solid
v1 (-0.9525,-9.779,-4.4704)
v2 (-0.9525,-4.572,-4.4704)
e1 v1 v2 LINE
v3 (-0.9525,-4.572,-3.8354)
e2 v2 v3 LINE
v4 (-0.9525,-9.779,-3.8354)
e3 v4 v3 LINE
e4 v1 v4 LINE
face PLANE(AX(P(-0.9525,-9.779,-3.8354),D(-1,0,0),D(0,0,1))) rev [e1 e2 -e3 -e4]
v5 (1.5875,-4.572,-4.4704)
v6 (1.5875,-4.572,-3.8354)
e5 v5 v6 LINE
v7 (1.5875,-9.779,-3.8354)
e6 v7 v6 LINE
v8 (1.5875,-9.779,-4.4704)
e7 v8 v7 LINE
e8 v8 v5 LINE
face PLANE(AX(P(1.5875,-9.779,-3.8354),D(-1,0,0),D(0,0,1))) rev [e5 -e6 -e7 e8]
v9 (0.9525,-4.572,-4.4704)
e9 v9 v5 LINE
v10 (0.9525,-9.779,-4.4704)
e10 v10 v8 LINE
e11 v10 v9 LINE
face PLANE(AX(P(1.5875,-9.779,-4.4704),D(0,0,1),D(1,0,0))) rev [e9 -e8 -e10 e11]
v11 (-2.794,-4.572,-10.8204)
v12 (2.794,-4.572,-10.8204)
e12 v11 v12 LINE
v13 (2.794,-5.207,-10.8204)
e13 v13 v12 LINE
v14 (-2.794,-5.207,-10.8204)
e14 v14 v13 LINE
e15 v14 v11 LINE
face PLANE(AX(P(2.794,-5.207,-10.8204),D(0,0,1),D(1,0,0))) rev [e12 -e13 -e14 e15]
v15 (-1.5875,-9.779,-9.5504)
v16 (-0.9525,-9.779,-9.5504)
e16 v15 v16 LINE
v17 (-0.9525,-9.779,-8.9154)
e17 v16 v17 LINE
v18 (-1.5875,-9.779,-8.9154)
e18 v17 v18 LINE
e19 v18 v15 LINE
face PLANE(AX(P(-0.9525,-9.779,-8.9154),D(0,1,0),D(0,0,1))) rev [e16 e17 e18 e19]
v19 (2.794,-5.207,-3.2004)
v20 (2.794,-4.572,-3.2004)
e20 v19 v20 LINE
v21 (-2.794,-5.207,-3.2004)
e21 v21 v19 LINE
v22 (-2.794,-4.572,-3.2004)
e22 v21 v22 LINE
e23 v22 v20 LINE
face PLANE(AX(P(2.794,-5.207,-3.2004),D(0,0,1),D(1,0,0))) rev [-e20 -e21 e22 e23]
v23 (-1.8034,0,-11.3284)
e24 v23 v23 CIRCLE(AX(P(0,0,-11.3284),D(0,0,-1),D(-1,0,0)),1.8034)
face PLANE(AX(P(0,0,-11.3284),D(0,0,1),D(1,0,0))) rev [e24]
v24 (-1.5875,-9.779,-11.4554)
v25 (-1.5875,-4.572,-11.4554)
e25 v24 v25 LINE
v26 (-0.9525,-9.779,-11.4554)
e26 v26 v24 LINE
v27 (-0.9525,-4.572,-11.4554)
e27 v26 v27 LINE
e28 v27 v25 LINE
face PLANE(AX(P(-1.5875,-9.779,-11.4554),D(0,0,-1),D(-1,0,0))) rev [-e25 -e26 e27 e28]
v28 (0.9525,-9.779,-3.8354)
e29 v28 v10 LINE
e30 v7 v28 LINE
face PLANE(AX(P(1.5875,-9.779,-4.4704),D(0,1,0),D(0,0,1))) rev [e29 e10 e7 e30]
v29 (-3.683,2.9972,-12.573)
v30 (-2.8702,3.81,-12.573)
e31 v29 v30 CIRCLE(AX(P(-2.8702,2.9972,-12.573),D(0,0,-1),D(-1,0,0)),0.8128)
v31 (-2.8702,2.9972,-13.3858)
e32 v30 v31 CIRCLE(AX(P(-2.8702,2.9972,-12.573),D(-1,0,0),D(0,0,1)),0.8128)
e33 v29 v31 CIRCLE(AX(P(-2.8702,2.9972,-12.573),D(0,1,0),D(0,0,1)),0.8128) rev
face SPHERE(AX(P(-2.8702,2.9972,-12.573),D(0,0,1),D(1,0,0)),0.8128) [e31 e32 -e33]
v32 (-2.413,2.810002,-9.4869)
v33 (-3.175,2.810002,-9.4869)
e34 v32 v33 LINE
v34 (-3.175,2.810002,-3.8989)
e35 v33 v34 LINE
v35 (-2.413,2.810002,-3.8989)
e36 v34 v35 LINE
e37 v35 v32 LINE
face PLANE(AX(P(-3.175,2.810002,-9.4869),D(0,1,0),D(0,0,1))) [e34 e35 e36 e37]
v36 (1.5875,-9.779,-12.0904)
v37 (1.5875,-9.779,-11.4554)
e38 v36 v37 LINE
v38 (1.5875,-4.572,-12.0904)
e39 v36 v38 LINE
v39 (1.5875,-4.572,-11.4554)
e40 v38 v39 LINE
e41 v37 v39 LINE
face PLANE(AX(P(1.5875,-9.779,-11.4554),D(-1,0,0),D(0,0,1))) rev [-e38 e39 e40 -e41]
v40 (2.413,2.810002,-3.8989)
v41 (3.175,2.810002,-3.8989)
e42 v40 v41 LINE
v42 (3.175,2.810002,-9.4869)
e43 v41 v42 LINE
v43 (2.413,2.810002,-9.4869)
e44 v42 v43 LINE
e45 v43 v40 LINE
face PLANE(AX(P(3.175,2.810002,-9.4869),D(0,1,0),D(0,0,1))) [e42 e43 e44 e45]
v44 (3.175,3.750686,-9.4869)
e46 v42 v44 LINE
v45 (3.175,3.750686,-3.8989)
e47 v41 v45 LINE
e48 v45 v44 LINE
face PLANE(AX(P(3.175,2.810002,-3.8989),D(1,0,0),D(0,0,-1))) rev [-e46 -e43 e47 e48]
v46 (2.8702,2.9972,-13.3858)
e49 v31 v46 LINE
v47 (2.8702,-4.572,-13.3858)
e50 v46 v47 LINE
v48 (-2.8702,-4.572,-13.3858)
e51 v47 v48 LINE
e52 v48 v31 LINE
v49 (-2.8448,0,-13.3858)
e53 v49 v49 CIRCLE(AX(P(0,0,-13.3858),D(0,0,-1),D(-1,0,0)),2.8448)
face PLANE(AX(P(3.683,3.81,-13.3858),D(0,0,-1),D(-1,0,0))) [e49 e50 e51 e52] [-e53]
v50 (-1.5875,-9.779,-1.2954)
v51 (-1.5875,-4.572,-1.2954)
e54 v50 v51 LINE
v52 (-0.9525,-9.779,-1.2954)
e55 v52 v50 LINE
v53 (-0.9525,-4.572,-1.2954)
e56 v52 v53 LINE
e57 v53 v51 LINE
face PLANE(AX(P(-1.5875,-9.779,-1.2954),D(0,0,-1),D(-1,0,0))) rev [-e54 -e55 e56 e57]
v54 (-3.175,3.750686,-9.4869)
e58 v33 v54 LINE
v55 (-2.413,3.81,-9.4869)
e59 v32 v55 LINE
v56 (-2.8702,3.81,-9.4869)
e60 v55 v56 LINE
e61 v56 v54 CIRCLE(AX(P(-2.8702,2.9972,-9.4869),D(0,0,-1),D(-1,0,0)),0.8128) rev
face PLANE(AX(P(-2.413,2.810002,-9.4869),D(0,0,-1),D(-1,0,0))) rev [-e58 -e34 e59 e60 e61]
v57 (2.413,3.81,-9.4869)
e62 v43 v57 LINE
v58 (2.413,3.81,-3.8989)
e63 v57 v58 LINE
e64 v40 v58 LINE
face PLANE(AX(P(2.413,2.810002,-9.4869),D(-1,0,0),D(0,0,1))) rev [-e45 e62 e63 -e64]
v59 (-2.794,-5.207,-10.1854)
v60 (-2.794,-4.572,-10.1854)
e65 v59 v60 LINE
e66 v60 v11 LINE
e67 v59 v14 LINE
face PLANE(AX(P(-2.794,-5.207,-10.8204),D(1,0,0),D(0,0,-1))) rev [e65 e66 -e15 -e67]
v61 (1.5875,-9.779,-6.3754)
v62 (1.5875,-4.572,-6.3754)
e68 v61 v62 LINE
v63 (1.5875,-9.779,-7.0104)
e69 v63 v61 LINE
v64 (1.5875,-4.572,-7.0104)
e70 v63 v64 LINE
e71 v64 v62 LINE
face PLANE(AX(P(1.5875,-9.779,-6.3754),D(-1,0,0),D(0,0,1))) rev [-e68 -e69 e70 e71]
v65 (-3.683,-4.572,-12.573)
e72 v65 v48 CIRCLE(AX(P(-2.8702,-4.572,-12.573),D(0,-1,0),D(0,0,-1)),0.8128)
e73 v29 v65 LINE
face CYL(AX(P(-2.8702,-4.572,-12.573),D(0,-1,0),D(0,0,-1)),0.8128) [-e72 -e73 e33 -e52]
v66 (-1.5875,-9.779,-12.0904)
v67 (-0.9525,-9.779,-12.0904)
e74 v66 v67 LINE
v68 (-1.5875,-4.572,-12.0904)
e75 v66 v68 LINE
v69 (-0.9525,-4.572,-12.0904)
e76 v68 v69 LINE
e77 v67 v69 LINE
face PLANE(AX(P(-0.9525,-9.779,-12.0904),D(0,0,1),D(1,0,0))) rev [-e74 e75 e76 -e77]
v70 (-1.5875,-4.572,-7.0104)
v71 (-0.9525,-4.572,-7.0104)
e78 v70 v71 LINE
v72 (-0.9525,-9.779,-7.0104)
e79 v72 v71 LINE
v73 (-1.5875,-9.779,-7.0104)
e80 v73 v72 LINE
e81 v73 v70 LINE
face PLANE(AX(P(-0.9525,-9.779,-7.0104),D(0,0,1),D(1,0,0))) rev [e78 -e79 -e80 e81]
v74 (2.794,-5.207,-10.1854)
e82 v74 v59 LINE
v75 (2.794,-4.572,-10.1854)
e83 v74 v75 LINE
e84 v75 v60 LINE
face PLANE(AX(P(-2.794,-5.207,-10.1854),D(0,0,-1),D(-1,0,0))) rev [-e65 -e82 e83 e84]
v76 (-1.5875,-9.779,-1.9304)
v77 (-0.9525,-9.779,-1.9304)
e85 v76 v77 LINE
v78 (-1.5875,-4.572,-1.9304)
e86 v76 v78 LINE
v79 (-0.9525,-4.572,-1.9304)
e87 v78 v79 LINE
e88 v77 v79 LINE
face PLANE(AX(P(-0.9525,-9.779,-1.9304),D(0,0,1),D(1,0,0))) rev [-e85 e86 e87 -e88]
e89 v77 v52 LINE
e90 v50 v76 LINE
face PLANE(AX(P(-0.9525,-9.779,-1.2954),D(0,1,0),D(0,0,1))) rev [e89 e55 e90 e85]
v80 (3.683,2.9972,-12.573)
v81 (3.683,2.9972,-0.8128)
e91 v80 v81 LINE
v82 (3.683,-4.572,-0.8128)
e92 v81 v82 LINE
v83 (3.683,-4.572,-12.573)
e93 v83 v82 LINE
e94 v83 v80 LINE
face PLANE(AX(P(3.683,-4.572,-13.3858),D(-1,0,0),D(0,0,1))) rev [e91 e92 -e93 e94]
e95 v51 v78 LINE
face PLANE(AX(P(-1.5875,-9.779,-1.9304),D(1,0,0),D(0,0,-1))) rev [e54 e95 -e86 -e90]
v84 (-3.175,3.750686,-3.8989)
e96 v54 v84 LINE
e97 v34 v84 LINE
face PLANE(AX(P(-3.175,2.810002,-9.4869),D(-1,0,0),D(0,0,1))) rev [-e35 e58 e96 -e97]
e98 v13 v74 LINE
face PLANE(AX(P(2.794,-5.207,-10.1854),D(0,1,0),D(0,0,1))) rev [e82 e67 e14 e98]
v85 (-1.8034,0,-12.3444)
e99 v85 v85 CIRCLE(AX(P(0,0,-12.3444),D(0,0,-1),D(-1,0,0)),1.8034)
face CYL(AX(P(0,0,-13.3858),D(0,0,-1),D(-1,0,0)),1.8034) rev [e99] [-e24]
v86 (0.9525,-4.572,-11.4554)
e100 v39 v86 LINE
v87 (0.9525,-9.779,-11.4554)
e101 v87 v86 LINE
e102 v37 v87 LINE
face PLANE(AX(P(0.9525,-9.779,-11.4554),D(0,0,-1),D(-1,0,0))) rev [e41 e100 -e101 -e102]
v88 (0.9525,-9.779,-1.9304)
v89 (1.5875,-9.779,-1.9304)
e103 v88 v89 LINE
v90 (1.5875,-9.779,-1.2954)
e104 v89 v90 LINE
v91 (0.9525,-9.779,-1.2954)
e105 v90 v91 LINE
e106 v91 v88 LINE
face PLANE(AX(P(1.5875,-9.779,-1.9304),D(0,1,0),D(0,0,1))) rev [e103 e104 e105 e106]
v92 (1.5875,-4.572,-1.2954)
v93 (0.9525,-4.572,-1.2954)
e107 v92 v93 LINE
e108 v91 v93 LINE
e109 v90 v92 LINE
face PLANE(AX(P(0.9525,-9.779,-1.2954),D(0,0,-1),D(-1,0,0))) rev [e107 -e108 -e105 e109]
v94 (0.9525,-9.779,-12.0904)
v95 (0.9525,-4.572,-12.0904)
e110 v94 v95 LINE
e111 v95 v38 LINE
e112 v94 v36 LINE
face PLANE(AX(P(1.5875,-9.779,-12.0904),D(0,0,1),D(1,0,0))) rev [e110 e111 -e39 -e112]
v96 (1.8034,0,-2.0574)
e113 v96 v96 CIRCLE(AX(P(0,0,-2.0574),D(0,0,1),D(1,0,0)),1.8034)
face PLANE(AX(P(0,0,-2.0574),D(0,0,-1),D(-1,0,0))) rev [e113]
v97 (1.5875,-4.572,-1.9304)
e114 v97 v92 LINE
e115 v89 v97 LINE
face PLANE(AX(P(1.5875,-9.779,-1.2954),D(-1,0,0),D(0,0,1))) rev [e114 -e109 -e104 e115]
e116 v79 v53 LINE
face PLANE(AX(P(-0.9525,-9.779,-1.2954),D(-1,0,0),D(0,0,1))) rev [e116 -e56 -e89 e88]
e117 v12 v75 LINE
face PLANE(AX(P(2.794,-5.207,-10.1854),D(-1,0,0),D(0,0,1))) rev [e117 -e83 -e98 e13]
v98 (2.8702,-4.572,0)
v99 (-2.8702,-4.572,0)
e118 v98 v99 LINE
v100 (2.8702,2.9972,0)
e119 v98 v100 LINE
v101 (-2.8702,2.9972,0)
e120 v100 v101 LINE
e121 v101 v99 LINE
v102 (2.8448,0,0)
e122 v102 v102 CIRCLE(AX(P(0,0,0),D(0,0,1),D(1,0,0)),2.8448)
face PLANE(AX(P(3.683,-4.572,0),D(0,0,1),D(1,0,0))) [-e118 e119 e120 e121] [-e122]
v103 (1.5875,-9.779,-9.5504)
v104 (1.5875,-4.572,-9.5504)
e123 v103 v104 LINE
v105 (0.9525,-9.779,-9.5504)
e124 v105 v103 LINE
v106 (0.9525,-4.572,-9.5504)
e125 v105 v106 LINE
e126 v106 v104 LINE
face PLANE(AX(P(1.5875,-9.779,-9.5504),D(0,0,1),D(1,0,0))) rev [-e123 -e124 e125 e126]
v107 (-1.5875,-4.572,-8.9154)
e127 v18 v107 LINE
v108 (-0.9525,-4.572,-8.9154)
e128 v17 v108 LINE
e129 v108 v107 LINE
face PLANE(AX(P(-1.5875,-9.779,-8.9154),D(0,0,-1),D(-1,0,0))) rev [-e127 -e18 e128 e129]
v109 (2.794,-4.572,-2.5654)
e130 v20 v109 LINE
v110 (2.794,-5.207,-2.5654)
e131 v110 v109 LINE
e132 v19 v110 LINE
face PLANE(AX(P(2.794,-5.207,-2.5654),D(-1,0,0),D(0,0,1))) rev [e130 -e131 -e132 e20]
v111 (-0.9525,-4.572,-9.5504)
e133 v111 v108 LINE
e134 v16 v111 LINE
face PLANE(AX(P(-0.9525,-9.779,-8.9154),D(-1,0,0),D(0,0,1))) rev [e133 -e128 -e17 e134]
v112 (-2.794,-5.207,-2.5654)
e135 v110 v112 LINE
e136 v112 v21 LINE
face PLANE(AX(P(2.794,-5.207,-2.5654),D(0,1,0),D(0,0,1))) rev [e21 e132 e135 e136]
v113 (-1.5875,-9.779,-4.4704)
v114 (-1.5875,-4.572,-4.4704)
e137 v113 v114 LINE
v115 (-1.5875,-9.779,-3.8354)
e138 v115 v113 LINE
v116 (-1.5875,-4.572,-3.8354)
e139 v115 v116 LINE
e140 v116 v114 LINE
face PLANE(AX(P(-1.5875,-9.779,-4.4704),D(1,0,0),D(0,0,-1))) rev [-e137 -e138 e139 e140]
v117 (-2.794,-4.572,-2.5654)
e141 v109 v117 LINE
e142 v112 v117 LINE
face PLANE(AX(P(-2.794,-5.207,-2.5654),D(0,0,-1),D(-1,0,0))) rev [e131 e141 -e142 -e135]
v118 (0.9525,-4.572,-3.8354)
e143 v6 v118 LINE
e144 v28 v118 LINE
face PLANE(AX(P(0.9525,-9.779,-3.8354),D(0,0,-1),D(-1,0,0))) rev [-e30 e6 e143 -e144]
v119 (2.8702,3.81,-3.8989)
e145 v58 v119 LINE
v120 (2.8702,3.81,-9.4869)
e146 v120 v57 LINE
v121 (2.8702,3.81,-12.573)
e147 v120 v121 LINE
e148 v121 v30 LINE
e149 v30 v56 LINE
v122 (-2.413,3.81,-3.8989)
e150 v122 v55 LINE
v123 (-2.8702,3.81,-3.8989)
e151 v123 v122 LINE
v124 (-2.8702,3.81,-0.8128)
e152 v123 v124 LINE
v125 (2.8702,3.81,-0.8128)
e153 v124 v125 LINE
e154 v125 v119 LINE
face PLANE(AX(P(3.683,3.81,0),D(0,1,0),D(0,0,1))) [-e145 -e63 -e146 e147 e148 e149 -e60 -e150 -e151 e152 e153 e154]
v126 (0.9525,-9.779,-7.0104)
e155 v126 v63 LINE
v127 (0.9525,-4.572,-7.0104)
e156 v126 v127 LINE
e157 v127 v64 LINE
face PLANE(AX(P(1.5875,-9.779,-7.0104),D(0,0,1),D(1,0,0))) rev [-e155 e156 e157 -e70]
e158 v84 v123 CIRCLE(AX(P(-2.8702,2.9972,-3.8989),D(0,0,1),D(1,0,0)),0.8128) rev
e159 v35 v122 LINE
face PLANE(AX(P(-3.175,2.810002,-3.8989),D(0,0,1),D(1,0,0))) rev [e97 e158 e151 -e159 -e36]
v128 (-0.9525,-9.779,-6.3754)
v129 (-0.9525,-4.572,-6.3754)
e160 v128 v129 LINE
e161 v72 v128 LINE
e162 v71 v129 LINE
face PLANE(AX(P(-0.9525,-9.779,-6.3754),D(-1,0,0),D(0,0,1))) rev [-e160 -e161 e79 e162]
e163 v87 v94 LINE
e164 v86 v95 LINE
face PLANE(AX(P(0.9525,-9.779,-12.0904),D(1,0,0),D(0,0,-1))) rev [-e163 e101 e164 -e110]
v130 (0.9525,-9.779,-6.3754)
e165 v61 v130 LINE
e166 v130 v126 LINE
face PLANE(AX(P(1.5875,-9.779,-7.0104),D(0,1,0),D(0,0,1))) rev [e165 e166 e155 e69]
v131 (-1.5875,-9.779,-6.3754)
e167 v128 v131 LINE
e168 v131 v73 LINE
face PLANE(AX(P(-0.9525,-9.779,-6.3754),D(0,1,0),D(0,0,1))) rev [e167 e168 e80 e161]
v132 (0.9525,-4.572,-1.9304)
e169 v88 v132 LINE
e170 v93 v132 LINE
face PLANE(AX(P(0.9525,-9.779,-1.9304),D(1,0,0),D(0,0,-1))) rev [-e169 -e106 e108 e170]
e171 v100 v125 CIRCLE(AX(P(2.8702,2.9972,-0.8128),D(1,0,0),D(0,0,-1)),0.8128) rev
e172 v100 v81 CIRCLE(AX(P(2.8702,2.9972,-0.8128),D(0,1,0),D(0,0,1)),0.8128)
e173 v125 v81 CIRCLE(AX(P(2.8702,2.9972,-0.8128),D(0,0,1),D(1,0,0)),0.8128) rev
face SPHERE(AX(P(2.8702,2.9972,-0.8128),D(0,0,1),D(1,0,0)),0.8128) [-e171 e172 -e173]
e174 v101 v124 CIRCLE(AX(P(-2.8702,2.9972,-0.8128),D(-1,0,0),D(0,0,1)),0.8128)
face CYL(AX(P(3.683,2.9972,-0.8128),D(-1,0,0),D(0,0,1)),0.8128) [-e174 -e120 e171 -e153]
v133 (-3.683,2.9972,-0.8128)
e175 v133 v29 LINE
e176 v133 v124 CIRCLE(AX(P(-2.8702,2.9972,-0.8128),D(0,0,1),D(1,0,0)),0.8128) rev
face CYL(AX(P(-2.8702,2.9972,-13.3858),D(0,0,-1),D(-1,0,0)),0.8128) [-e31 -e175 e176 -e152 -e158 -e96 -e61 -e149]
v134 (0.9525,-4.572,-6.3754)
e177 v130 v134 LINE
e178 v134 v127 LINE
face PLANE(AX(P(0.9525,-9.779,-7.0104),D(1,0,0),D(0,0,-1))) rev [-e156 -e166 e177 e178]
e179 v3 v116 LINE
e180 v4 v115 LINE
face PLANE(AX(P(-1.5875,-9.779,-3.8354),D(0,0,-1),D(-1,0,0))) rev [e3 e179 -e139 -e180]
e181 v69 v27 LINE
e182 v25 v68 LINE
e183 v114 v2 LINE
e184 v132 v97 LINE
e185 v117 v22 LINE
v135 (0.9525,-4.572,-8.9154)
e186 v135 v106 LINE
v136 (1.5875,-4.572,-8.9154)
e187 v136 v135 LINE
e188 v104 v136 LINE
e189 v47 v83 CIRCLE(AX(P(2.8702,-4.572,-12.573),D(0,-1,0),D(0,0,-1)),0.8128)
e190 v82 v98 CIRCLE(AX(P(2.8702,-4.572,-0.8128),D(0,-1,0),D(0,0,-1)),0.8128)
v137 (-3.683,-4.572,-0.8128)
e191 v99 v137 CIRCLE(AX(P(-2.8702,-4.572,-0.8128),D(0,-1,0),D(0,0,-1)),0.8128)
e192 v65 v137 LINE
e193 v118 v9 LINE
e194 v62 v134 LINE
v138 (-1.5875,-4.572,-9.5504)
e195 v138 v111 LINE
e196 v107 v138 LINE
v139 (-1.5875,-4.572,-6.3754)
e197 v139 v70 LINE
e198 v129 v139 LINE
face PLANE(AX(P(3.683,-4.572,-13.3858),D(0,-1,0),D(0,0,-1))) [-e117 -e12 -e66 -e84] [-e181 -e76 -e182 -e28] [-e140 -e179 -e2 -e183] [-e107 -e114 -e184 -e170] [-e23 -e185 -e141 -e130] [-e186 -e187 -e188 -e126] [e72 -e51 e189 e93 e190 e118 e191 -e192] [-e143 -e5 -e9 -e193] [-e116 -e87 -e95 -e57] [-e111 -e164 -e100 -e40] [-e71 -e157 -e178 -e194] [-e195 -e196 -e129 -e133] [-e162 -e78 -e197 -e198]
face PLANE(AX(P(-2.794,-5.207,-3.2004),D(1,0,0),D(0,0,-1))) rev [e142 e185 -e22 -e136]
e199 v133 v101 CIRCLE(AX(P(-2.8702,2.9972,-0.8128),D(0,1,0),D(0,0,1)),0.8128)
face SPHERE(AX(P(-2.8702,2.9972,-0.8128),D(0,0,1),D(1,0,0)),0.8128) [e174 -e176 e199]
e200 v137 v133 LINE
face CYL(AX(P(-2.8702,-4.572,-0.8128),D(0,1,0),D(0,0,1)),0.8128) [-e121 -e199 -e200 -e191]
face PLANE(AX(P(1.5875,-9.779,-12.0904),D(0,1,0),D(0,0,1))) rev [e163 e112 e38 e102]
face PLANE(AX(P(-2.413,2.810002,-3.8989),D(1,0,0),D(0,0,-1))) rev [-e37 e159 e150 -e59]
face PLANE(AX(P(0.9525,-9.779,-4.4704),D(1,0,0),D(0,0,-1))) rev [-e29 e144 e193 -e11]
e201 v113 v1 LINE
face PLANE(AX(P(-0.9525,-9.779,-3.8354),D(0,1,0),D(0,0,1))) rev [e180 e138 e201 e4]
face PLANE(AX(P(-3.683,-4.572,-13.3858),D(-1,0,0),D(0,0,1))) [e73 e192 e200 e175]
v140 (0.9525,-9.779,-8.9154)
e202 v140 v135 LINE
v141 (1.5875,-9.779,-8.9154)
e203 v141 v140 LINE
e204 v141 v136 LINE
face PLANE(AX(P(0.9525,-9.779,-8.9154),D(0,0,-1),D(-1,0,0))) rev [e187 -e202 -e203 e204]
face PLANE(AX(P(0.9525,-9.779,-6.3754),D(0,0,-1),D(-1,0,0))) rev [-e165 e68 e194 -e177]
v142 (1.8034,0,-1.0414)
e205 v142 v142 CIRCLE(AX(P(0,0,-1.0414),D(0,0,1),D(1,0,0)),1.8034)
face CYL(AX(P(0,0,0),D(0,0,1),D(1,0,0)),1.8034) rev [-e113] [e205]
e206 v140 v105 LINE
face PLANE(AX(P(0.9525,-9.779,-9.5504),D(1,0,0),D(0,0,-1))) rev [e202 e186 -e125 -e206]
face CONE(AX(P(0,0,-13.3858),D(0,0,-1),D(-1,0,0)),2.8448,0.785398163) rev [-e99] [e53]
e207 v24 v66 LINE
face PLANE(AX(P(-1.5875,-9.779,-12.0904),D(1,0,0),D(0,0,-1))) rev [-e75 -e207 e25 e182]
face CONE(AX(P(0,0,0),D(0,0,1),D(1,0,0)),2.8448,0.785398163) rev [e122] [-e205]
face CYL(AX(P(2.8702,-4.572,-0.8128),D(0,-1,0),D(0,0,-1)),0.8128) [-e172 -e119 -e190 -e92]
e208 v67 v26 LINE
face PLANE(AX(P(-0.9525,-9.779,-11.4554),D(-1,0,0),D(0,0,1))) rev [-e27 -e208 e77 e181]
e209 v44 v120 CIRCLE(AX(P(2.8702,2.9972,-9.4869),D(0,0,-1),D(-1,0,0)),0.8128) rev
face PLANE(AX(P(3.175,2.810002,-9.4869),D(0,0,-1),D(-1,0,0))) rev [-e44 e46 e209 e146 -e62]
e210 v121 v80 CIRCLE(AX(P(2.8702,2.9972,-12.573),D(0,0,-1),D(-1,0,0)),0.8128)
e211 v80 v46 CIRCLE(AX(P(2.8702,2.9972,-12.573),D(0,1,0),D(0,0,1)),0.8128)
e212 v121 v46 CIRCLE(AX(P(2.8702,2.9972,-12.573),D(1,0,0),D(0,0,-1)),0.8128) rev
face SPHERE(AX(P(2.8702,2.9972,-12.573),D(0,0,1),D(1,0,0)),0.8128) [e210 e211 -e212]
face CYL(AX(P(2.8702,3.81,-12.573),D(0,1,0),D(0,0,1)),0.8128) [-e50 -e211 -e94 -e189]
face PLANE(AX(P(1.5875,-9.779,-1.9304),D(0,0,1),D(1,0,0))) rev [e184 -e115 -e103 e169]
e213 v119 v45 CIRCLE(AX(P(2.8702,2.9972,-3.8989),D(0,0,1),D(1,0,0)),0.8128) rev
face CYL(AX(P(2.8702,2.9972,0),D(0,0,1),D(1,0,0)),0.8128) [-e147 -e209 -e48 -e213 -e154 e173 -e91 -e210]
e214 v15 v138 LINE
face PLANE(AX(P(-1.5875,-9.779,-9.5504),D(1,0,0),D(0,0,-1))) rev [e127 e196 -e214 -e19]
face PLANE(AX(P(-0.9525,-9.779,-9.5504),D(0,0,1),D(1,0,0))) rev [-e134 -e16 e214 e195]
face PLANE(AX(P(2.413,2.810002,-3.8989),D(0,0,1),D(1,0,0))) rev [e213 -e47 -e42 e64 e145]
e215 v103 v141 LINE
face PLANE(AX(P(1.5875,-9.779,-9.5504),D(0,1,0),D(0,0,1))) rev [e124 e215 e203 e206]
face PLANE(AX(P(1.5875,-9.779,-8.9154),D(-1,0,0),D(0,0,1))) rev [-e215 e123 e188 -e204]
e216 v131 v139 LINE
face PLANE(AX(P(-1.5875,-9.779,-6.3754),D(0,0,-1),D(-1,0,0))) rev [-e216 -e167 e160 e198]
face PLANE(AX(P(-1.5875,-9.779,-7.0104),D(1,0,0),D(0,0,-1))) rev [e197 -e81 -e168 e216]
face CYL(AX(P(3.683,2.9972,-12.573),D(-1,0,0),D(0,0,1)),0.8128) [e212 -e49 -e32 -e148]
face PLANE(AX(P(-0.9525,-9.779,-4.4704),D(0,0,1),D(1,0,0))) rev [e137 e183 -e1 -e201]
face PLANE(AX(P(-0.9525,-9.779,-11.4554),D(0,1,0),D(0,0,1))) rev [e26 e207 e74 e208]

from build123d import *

# Parameters (mm, degrees)
SKETCH1_W            = 8.382
SKETCH1_H            = 13.3858
BOSS_EXTRUDE1_DEPTH  = 7.366
SKETCH2_W            = 5.588
SKETCH2_H            = 0.635
BOSS_EXTRUDE2_DEPTH  = 0.635
SKETCH3_W            = 5.588
SKETCH3_H            = 0.635
BOSS_EXTRUDE3_DEPTH  = 0.635
SKETCH4_W            = 0.635
SKETCH4_H            = 0.635
BOSS_EXTRUDE4_DEPTH  = 5.207
SKETCH5_W            = 0.635
SKETCH5_H            = 0.635
BOSS_EXTRUDE5_DEPTH  = 5.207
SKETCH6_W            = 0.635
SKETCH6_H            = 0.635
BOSS_EXTRUDE6_DEPTH  = 5.207
SKETCH7_W            = 0.635
SKETCH7_H            = 0.635
BOSS_EXTRUDE7_DEPTH  = 5.207
SKETCH8_W            = 0.635
SKETCH8_H            = 0.635
BOSS_EXTRUDE8_DEPTH  = 5.207
SKETCH9_W            = 0.635
SKETCH9_H            = 0.635
BOSS_EXTRUDE9_DEPTH  = 5.207
SKETCH10_W           = 0.635
SKETCH10_H           = 0.635
BOSS_EXTRUDE10_DEPTH = 5.207
SKETCH11_W           = 0.635
SKETCH11_H           = 0.635
BOSS_EXTRUDE11_DEPTH = 5.207
SKETCH12_W           = 0.635
SKETCH12_H           = 0.635
BOSS_EXTRUDE12_DEPTH = 5.207
SKETCH13_W           = 0.635
SKETCH13_H           = 0.635
BOSS_EXTRUDE13_DEPTH = 5.207
SKETCH14_W           = 0.762
SKETCH14_H           = 5.588
CUT_EXTRUDE1_DEPTH   = 0.999998
SKETCH15_W           = 0.762
SKETCH15_H           = 5.588
CUT_EXTRUDE2_DEPTH   = 0.999998
FILLET1_R            = 0.8128


with BuildPart() as part:
    # Sketch1 → Boss-Extrude1 (new body)
    with BuildSketch(Plane(origin=(-3.683, 0, 0), x_dir=(0, -1, 0), z_dir=(-1, 0, 0))):
        with Locations((0.381, -6.6929)):
            Rectangle(SKETCH1_W, SKETCH1_H)
    extrude(amount=-BOSS_EXTRUDE1_DEPTH)

    # Sketch2 → Boss-Extrude2 (add)
    with BuildSketch(Plane.XZ.offset(4.572)):
        with Locations((0, -2.8829)):
            Rectangle(SKETCH2_W, SKETCH2_H)
    extrude(amount=BOSS_EXTRUDE2_DEPTH)

    # Sketch3 → Boss-Extrude3 (add)
    with BuildSketch(Plane.XZ.offset(4.572)):
        with Locations((0, -10.5029)):
            Rectangle(SKETCH3_W, SKETCH3_H)
    extrude(amount=BOSS_EXTRUDE3_DEPTH)

    # Sketch4 → Boss-Extrude4 (add)
    with BuildSketch(Plane.XZ.offset(4.572)):
        with Locations((1.27, -11.7729)):
            Rectangle(SKETCH4_W, SKETCH4_H)
    extrude(amount=BOSS_EXTRUDE4_DEPTH)

    # Sketch5 → Boss-Extrude5 (add)
    with BuildSketch(Plane.XZ.offset(4.572)):
        with Locations((-1.27, -11.7729)):
            Rectangle(SKETCH5_W, SKETCH5_H)
    extrude(amount=BOSS_EXTRUDE5_DEPTH)

    # Sketch6 → Boss-Extrude6 (add)
    with BuildSketch(Plane.XZ.offset(4.572)):
        with Locations((1.27, -9.2329)):
            Rectangle(SKETCH6_W, SKETCH6_H)
    extrude(amount=BOSS_EXTRUDE6_DEPTH)

    # Sketch7 → Boss-Extrude7 (add)
    with BuildSketch(Plane.XZ.offset(4.572)):
        with Locations((-1.27, -9.2329)):
            Rectangle(SKETCH7_W, SKETCH7_H)
    extrude(amount=BOSS_EXTRUDE7_DEPTH)

    # Sketch8 → Boss-Extrude8 (add)
    with BuildSketch(Plane.XZ.offset(4.572)):
        with Locations((1.27, -6.6929)):
            Rectangle(SKETCH8_W, SKETCH8_H)
    extrude(amount=BOSS_EXTRUDE8_DEPTH)

    # Sketch9 → Boss-Extrude9 (add)
    with BuildSketch(Plane.XZ.offset(4.572)):
        with Locations((-1.27, -6.6929)):
            Rectangle(SKETCH9_W, SKETCH9_H)
    extrude(amount=BOSS_EXTRUDE9_DEPTH)

    # Sketch10 → Boss-Extrude10 (add)
    with BuildSketch(Plane.XZ.offset(4.572)):
        with Locations((1.27, -4.1529)):
            Rectangle(SKETCH10_W, SKETCH10_H)
    extrude(amount=BOSS_EXTRUDE10_DEPTH)

    # Sketch11 → Boss-Extrude11 (add)
    with BuildSketch(Plane.XZ.offset(4.572)):
        with Locations((-1.27, -4.1529)):
            Rectangle(SKETCH11_W, SKETCH11_H)
    extrude(amount=BOSS_EXTRUDE11_DEPTH)

    # Sketch12 → Boss-Extrude12 (add)
    with BuildSketch(Plane.XZ.offset(4.572)):
        with Locations((1.27, -1.6129)):
            Rectangle(SKETCH12_W, SKETCH12_H)
    extrude(amount=BOSS_EXTRUDE12_DEPTH)

    # Sketch13 → Boss-Extrude13 (add)
    with BuildSketch(Plane.XZ.offset(4.572)):
        with Locations((-1.27, -1.6129)):
            Rectangle(SKETCH13_W, SKETCH13_H)
    extrude(amount=BOSS_EXTRUDE13_DEPTH)

    # Sketch14 → Cut-Extrude1 (cut)
    with BuildSketch(Plane(origin=(0, 3.81, 0), x_dir=(-1, 0, 0), z_dir=(0, 1, 0))):
        with Locations((2.794, -6.6929)):
            Rectangle(SKETCH14_W, SKETCH14_H)
    extrude(amount=-CUT_EXTRUDE1_DEPTH, mode=Mode.SUBTRACT)

    # Sketch15 → Cut-Extrude2 (cut)
    with BuildSketch(Plane(origin=(0, 3.81, 0), x_dir=(-1, 0, 0), z_dir=(0, 1, 0))):
        with Locations((-2.794, -6.6929)):
            Rectangle(SKETCH15_W, SKETCH15_H)
    extrude(amount=-CUT_EXTRUDE2_DEPTH, mode=Mode.SUBTRACT)

    # Sketch16 → Hole1 (revolve, cut)
    with BuildSketch(Plane(origin=(0, 0, 0), x_dir=(0, -1, 0), z_dir=(1, 0, 0))):
        Polygon((0, 0), (0, 2.0574), (1.8034, 2.0574), (1.8034, 1.0414), (2.8448, 0), align=None)
    revolve(axis=Axis((0, 0, 6.445314094), (0, 0, -1)), mode=Mode.SUBTRACT)

    # Sketch18 → Hole2 (revolve, cut)
    with BuildSketch(Plane(origin=(0, 0, -13.3858), x_dir=(0, 1, 0), z_dir=(1, 0, 0))):
        Polygon((0, 0), (0, 2.0574), (1.8034, 2.0574), (1.8034, 1.0414), (2.8448, 0), align=None)
    revolve(axis=Axis((0, 0, -19.831114094), (0, 0, 1)), mode=Mode.SUBTRACT)

    # Fillet1
    # the kernel refuses this fillet: 0.8128 mm, written as the material it takes off along each edge
    with BuildSketch(Plane(origin=(-2.8702, 2.9972, -12.573), x_dir=(-1, 0, 0), z_dir=(0, 0, -1))) as fillet1_piece_1_section:
        Polygon((0, 0), (FILLET1_R, 0), (FILLET1_R, FILLET1_R), (0, FILLET1_R), align=None)
    fillet1_piece_1 = extrude(amount=FILLET1_R, mode=Mode.PRIVATE)
    fillet1_piece_1 = fillet1_piece_1 - Plane(origin=(-2.8702, 2.9972, -12.573), x_dir=(0.7071067811865475, -0.7071067811865475, 0), z_dir=(0, 0, -1)) * Sphere(FILLET1_R, mode=Mode.PRIVATE)
    add(fillet1_piece_1, mode=Mode.SUBTRACT)
    with BuildSketch(Plane(origin=(2.8702, 2.9972, -12.573), x_dir=(1, 0, 0), z_dir=(0, 0, -1))) as fillet1_piece_2_section:
        Polygon((0, 0), (FILLET1_R, 0), (FILLET1_R, -FILLET1_R), (0, -FILLET1_R), align=None)
    fillet1_piece_2 = extrude(amount=FILLET1_R, mode=Mode.PRIVATE)
    fillet1_piece_2 = fillet1_piece_2 - Plane(origin=(2.8702, 2.9972, -12.573), x_dir=(-0.7071067811865475, -0.7071067811865475, 0), z_dir=(0, 0, -1)) * Sphere(FILLET1_R, mode=Mode.PRIVATE)
    add(fillet1_piece_2, mode=Mode.SUBTRACT)
    with BuildSketch(Plane(origin=(-2.8702, 2.9972, -0.8128), x_dir=(0, 0, 1), z_dir=(-1, 0, 0))) as fillet1_piece_3_section:
        Polygon((0, 0), (FILLET1_R, 0), (FILLET1_R, FILLET1_R), (0, FILLET1_R), align=None)
    fillet1_piece_3 = extrude(amount=FILLET1_R, mode=Mode.PRIVATE)
    fillet1_piece_3 = fillet1_piece_3 - Plane(origin=(-2.8702, 2.9972, -0.8128), x_dir=(0, -0.7071067811865475, -0.7071067811865475), z_dir=(-1, 0, 0)) * Sphere(FILLET1_R, mode=Mode.PRIVATE)
    add(fillet1_piece_3, mode=Mode.SUBTRACT)
    with BuildSketch(Plane(origin=(2.8702, 2.9972, -0.8128), x_dir=(0, 0, 1), z_dir=(1, 0, 0))) as fillet1_piece_4_section:
        Polygon((0, 0), (FILLET1_R, 0), (FILLET1_R, -FILLET1_R), (0, -FILLET1_R), align=None)
    fillet1_piece_4 = extrude(amount=FILLET1_R, mode=Mode.PRIVATE)
    fillet1_piece_4 = fillet1_piece_4 - Plane(origin=(2.8702, 2.9972, -0.8128), x_dir=(0, -0.7071067811865475, -0.7071067811865475), z_dir=(1, 0, 0)) * Sphere(FILLET1_R, mode=Mode.PRIVATE)
    add(fillet1_piece_4, mode=Mode.SUBTRACT)
    with BuildSketch(Plane(origin=(-3.683, 2.9972, -13.3858), x_dir=(1, 0, 0), z_dir=(0, -1, 0)), Plane(origin=(3.683, -6.604, 0), x_dir=(0, 0, -1), z_dir=(0, 1, 0))) as fillet1_piece_5:
        with BuildLine():
            CenterArc((FILLET1_R, FILLET1_R), FILLET1_R, 180, 90)
            Line((0, FILLET1_R), (0, 0))
            Line((0, 0), (FILLET1_R, 0))
        make_face()
    extrude(amount=9.6012, mode=Mode.SUBTRACT)
    with BuildSketch(Plane(origin=(-2.8702, 3.81, -13.3858), x_dir=(0, -1, 0), z_dir=(1, 0, 0))) as fillet1_piece_6:
        with BuildLine():
            CenterArc((FILLET1_R, -FILLET1_R), FILLET1_R, 90, 90)
            Line((0, -FILLET1_R), (0, 0))
            Line((0, 0), (FILLET1_R, 0))
        make_face()
    extrude(amount=5.7404, mode=Mode.SUBTRACT)
    with BuildSketch(Plane(origin=(3.683, 2.9972, -13.3858), x_dir=(-1, 0, 0), z_dir=(0, -1, 0)), Plane(origin=(-3.683, -6.604, 0), x_dir=(0, 0, -1), z_dir=(0, 1, 0))) as fillet1_piece_7:
        with BuildLine():
            CenterArc((FILLET1_R, -FILLET1_R), FILLET1_R, 90, 90)
            Line((0, -FILLET1_R), (0, 0))
            Line((0, 0), (FILLET1_R, 0))
        make_face()
    extrude(amount=9.6012, mode=Mode.SUBTRACT)
    with BuildSketch(Plane(origin=(-3.683, 3.81, -0.8128), x_dir=(0, -1, 0), z_dir=(0, 0, -1))) as fillet1_piece_8:
        with BuildLine():
            CenterArc((FILLET1_R, -FILLET1_R), FILLET1_R, 90, 90)
            Line((0, -FILLET1_R), (0, 0))
            Line((0, 0), (FILLET1_R, 0))
        make_face()
    extrude(amount=11.7602, mode=Mode.SUBTRACT)
    with BuildSketch(Plane(origin=(3.683, 3.81, -0.8128), x_dir=(0, -1, 0), z_dir=(0, 0, -1))) as fillet1_piece_9:
        with BuildLine():
            CenterArc((FILLET1_R, FILLET1_R), FILLET1_R, 180, 90)
            Line((0, FILLET1_R), (0, 0))
            Line((0, 0), (FILLET1_R, 0))
        make_face()
    extrude(amount=11.7602, mode=Mode.SUBTRACT)
    with BuildSketch(Plane(origin=(-2.8702, 3.81, 0), x_dir=(0, -1, 0), z_dir=(1, 0, 0))) as fillet1_piece_10:
        with BuildLine():
            CenterArc((FILLET1_R, FILLET1_R), FILLET1_R, 180, 90)
            Line((0, FILLET1_R), (0, 0))
            Line((0, 0), (FILLET1_R, 0))
        make_face()
    extrude(amount=5.7404, mode=Mode.SUBTRACT)


solid = part.part
